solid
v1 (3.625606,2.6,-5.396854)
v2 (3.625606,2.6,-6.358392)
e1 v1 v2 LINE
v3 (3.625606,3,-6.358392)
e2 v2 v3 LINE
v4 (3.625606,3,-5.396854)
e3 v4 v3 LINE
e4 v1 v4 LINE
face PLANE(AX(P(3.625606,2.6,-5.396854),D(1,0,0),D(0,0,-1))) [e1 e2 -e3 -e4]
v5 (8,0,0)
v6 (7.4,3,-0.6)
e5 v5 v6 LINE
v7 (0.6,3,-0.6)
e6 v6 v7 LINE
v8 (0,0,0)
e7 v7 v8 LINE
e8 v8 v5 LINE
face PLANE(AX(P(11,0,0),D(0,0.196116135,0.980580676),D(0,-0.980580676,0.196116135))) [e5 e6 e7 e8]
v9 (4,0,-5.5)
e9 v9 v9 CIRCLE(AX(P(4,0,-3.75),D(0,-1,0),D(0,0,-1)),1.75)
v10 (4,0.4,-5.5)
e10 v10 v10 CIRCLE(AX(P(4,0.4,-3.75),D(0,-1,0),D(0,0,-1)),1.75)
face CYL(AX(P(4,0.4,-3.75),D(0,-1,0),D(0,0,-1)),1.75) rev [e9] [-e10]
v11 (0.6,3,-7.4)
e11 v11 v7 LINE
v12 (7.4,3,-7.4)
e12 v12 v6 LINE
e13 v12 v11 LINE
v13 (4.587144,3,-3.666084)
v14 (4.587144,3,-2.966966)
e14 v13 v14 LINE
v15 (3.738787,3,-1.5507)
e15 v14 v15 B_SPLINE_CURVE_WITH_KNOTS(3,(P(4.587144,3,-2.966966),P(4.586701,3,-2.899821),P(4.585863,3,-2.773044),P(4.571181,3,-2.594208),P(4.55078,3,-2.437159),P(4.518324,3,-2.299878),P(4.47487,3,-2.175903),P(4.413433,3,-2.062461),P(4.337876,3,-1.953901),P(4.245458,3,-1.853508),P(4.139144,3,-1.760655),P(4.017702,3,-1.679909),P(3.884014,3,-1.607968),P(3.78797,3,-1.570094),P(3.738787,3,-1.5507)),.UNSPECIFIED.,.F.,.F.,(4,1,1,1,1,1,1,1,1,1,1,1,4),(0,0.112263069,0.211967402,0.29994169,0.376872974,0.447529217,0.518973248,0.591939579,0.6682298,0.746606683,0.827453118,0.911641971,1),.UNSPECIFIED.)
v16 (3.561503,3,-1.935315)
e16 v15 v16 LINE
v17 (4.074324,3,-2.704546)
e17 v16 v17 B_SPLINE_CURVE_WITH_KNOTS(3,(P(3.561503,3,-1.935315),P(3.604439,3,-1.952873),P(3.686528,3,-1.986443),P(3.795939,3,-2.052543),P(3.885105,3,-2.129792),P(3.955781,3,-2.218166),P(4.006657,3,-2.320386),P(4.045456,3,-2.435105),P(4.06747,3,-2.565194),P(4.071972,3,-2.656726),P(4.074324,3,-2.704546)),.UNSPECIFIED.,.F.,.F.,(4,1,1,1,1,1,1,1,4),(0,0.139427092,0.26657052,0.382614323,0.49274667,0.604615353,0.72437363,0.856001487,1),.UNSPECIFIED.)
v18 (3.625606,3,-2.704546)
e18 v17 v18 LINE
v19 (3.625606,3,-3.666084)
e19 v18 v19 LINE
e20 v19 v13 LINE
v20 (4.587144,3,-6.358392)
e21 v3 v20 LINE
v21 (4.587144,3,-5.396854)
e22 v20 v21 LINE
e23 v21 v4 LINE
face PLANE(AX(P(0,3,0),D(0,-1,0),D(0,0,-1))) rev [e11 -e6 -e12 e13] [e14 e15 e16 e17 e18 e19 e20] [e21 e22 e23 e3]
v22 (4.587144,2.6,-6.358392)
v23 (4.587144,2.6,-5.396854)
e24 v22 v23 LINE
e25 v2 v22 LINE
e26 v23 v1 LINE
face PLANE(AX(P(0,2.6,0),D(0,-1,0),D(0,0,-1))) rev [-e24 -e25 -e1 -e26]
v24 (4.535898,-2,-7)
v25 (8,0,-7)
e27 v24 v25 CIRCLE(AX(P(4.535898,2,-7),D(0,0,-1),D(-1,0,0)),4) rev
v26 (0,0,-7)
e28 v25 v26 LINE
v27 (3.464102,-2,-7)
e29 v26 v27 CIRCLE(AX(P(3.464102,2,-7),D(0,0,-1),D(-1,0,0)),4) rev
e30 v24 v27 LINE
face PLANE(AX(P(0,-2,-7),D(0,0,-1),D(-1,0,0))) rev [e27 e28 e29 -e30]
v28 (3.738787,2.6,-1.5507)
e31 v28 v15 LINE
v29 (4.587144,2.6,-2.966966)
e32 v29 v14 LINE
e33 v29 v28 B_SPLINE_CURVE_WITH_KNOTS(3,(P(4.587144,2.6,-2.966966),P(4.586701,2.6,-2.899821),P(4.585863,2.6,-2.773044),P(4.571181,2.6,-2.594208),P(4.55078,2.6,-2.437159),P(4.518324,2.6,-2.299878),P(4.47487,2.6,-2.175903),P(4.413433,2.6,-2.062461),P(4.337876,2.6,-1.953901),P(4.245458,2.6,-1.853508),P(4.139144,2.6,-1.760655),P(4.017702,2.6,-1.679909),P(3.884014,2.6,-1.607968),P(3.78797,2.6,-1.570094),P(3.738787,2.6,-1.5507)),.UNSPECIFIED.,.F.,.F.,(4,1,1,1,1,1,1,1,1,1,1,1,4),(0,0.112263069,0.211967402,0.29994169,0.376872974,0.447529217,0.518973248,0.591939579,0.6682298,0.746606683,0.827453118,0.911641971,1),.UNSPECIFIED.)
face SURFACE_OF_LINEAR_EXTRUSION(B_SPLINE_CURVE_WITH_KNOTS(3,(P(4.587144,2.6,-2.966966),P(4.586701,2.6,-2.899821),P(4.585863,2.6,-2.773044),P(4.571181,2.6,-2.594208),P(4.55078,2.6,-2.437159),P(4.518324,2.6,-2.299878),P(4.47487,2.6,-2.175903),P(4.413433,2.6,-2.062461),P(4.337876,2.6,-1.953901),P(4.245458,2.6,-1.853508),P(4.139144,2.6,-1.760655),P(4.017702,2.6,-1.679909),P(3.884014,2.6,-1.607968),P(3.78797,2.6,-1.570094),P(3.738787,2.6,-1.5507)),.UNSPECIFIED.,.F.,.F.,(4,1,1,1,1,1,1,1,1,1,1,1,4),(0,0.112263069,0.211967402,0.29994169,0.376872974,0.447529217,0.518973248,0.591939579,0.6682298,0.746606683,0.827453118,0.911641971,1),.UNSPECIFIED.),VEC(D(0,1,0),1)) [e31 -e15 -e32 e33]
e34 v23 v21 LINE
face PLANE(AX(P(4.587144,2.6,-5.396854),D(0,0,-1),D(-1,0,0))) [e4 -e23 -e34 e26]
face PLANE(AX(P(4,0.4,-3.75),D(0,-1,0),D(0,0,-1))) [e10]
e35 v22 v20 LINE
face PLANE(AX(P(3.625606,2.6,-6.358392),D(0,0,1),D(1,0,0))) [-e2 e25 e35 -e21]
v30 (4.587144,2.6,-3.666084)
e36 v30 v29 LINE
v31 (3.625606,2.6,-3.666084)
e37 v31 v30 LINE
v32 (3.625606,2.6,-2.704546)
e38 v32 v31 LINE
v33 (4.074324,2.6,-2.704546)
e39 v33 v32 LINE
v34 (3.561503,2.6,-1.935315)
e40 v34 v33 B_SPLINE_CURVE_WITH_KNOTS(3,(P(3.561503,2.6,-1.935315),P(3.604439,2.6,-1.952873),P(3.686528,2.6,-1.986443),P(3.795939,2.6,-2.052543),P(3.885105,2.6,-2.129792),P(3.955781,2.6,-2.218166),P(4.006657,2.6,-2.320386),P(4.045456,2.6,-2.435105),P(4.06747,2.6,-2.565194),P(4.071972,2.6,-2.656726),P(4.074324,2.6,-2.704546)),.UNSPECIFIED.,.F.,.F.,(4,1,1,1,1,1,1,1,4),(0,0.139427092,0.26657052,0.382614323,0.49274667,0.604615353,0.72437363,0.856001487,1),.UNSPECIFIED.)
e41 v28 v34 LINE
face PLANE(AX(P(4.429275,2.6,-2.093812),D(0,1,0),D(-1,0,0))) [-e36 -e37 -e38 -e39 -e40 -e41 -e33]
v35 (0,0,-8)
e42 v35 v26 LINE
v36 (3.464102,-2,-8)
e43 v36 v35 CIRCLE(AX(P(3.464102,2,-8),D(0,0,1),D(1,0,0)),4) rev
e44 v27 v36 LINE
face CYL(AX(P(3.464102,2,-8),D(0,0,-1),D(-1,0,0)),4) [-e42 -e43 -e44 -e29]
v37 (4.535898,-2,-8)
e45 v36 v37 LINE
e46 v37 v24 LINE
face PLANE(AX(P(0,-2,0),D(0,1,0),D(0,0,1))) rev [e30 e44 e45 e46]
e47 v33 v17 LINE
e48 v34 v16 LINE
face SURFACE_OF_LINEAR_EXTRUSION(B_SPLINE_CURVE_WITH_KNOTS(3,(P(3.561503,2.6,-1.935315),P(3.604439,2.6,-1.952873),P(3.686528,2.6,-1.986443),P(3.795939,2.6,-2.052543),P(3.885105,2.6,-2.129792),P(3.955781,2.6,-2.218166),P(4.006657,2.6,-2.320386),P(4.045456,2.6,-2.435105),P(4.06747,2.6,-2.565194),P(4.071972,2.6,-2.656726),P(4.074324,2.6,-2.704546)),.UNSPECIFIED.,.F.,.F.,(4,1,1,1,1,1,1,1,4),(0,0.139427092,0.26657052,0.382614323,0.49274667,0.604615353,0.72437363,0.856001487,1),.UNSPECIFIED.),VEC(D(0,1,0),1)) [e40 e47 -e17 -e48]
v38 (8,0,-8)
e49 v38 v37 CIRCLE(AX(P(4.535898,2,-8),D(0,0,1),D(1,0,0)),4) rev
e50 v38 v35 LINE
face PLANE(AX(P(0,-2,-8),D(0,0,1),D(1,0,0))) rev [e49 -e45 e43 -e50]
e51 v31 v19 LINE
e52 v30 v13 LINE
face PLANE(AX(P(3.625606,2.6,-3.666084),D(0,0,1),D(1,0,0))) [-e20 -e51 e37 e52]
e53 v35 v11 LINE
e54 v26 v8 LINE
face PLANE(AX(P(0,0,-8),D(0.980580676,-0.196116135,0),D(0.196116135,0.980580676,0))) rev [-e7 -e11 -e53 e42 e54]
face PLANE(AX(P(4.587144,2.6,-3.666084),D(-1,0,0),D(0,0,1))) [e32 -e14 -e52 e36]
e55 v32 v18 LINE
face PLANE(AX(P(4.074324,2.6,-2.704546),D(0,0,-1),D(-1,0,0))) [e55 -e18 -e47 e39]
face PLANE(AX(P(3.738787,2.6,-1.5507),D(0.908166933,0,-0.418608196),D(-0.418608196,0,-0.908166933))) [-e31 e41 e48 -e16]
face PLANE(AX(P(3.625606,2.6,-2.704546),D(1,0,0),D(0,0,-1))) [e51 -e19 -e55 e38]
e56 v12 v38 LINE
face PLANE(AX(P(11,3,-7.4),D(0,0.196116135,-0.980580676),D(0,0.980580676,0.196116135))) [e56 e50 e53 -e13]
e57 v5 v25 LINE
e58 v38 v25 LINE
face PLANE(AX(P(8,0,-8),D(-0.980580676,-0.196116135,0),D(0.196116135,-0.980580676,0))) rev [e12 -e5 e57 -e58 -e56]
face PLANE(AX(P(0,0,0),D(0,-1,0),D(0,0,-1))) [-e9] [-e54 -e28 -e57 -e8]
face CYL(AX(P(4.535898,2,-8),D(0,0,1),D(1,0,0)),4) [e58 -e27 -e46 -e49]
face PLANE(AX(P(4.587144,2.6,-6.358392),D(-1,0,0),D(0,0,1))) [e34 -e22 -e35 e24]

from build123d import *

# Parameters (mm, degrees)
SKETCH1_W               = 8
SKETCH1_H               = 8
BOSS_EXTRUDE1_DEPTH     = 3
CUT_EXTRUDE1_DEPTH      = 12.704699911
CUT_EXTRUDE1_DEPTH_BACK = 12.704699911
CUT_EXTRUDE2_DEPTH      = 11
SKETCH4_R               = 1.75
CUT_EXTRUDE3_DEPTH      = 0.4
SKETCH5_W               = 8
SKETCH5_H               = 1
BOSS_EXTRUDE2_DEPTH     = 2
FILLET1_R               = 4
SKETCH6_W               = 0.961538461
SKETCH6_H               = 0.961538462
CUT_EXTRUDE4_DEPTH      = 0.4


with BuildPart() as part:
    # Sketch1 → Boss-Extrude1 (new body)
    with BuildSketch(Plane(origin=(0, 0, 0), x_dir=(1, 0, 0), z_dir=(0, 1, 0))):
        with Locations((4, 4)):
            Rectangle(SKETCH1_W, SKETCH1_H)
    extrude(amount=BOSS_EXTRUDE1_DEPTH)

    # Sketch2 → Cut-Extrude1 (cut, two sides: drawn at the far end of the back side and taken through both)
    with BuildSketch(Plane.XY.offset(-CUT_EXTRUDE1_DEPTH_BACK)):
        Polygon((0, 0), (0.6, 3), (0, 3), align=None)
        Polygon((8, 0), (7.4, 3), (8, 3), align=None)
    extrude(amount=CUT_EXTRUDE1_DEPTH + CUT_EXTRUDE1_DEPTH_BACK, mode=Mode.SUBTRACT)

    # Sketch3 → Cut-Extrude2 (cut)
    with BuildSketch(Plane(origin=(0, 0, 0), x_dir=(0, 0, -1), z_dir=(1, 0, 0))):
        Polygon((0, 0), (0.6, 3), (0, 3), align=None)
        Polygon((8, 3), (7.4, 3), (8, 0), align=None)
    extrude(amount=CUT_EXTRUDE2_DEPTH, mode=Mode.SUBTRACT)

    # Sketch4 → Cut-Extrude3 (cut)
    with BuildSketch(Plane.XZ):
        with Locations(Location((4, -3.75, 0), (0, 0, 270))):
            Circle(SKETCH4_R)
    extrude(amount=-CUT_EXTRUDE3_DEPTH, mode=Mode.SUBTRACT)

    # Sketch5 → Boss-Extrude2 (add)
    with BuildSketch(Plane.XZ):
        with Locations((4, -7.5)):
            Rectangle(SKETCH5_W, SKETCH5_H)
    extrude(amount=BOSS_EXTRUDE2_DEPTH)

    # Fillet1
    # the kernel refuses this fillet: 4 mm, written as the material it takes off along each edge
    with BuildSketch(Plane(origin=(8, -2, -16.660254038), x_dir=(0, 1, 0), z_dir=(0, 0, 1)), Plane(origin=(0, -2, 1.660254038), x_dir=(0, 1, 0), z_dir=(0, 0, -1))) as fillet1_piece_1:
        with BuildLine():
            CenterArc((4, 3.464101615), FILLET1_R, 180, 60)
            Line((0, 3.464101615), (-0.08, 3.464101615))
            Line((-0.08, 3.464101615), (-0.08, 0))
            Line((-0.08, 0), (0, -0.08))
            ThreePointArc((0, -0.08), (1, -0.08), (1.96, -0.069282032))
            Line((1.96, -0.069282032), (2, 0))
        make_face()
    extrude(amount=18.320508076, mode=Mode.SUBTRACT)

    # Sketch6 → Cut-Extrude4 (cut)
    with BuildSketch(Plane(origin=(0, 3, 0), x_dir=(1, 0, 0), z_dir=(0, 1, 0))):
        with Locations((4.106375193, 5.877622732)):
            Rectangle(SKETCH6_W, SKETCH6_H)
        with BuildLine():
            Line((3.625605963, 3.666084271), (4.587144424, 3.666084271))
            Line((4.587144424, 3.666084271), (4.587144424, 2.966965681))
            add(Edge.make_bspline(
                [(4.587144424, 2.966965681), (4.586700802, 2.899821455), (4.585863185, 2.773044347), (4.571180714, 2.594207821), (4.550779556, 2.437158718), (4.518324342, 2.299878361), (4.47486997, 2.175902827), (4.413432502, 2.062461013), (4.337876173, 1.953901165), (4.245458326, 1.85350819), (4.139144335, 1.760654771), (4.017702284, 1.679908688), (3.88401418, 1.607967915), (3.787969656, 1.570094118), (3.738787052, 1.550699655)],
                knots=[0, 0, 0, 0, 1.347156832, 2.543608823, 3.599300285, 4.522475688, 5.370350604, 6.227678973, 7.103274953, 8.018757603, 8.959280198, 9.929437417, 10.939703653, 12, 12, 12, 12], degree=3))
            Line((3.738787052, 1.550699655), (3.561503399, 1.93531504))
            add(Edge.make_bspline(
                [(3.561503399, 1.93531504), (3.604439047, 1.952873279), (3.686527672, 1.986442858), (3.795938691, 2.052543314), (3.885105421, 2.129792439), (3.955780801, 2.218165676), (4.006656804, 2.32038588), (4.045456087, 2.435104657), (4.0674697, 2.56519407), (4.07197182, 2.656725854), (4.074323911, 2.704545809)],
                knots=[0, 0, 0, 0, 1.115416734, 2.132564161, 3.06091458, 3.941973359, 4.836922823, 5.794989041, 6.848011894, 8, 8, 8, 8], degree=3))
            Line((4.074323911, 2.704545809), (3.625605963, 2.704545809))
            Line((3.625605963, 2.704545809), (3.625605963, 3.666084271))
        make_face()
    extrude(amount=-CUT_EXTRUDE4_DEPTH, mode=Mode.SUBTRACT)


solid = part.part
